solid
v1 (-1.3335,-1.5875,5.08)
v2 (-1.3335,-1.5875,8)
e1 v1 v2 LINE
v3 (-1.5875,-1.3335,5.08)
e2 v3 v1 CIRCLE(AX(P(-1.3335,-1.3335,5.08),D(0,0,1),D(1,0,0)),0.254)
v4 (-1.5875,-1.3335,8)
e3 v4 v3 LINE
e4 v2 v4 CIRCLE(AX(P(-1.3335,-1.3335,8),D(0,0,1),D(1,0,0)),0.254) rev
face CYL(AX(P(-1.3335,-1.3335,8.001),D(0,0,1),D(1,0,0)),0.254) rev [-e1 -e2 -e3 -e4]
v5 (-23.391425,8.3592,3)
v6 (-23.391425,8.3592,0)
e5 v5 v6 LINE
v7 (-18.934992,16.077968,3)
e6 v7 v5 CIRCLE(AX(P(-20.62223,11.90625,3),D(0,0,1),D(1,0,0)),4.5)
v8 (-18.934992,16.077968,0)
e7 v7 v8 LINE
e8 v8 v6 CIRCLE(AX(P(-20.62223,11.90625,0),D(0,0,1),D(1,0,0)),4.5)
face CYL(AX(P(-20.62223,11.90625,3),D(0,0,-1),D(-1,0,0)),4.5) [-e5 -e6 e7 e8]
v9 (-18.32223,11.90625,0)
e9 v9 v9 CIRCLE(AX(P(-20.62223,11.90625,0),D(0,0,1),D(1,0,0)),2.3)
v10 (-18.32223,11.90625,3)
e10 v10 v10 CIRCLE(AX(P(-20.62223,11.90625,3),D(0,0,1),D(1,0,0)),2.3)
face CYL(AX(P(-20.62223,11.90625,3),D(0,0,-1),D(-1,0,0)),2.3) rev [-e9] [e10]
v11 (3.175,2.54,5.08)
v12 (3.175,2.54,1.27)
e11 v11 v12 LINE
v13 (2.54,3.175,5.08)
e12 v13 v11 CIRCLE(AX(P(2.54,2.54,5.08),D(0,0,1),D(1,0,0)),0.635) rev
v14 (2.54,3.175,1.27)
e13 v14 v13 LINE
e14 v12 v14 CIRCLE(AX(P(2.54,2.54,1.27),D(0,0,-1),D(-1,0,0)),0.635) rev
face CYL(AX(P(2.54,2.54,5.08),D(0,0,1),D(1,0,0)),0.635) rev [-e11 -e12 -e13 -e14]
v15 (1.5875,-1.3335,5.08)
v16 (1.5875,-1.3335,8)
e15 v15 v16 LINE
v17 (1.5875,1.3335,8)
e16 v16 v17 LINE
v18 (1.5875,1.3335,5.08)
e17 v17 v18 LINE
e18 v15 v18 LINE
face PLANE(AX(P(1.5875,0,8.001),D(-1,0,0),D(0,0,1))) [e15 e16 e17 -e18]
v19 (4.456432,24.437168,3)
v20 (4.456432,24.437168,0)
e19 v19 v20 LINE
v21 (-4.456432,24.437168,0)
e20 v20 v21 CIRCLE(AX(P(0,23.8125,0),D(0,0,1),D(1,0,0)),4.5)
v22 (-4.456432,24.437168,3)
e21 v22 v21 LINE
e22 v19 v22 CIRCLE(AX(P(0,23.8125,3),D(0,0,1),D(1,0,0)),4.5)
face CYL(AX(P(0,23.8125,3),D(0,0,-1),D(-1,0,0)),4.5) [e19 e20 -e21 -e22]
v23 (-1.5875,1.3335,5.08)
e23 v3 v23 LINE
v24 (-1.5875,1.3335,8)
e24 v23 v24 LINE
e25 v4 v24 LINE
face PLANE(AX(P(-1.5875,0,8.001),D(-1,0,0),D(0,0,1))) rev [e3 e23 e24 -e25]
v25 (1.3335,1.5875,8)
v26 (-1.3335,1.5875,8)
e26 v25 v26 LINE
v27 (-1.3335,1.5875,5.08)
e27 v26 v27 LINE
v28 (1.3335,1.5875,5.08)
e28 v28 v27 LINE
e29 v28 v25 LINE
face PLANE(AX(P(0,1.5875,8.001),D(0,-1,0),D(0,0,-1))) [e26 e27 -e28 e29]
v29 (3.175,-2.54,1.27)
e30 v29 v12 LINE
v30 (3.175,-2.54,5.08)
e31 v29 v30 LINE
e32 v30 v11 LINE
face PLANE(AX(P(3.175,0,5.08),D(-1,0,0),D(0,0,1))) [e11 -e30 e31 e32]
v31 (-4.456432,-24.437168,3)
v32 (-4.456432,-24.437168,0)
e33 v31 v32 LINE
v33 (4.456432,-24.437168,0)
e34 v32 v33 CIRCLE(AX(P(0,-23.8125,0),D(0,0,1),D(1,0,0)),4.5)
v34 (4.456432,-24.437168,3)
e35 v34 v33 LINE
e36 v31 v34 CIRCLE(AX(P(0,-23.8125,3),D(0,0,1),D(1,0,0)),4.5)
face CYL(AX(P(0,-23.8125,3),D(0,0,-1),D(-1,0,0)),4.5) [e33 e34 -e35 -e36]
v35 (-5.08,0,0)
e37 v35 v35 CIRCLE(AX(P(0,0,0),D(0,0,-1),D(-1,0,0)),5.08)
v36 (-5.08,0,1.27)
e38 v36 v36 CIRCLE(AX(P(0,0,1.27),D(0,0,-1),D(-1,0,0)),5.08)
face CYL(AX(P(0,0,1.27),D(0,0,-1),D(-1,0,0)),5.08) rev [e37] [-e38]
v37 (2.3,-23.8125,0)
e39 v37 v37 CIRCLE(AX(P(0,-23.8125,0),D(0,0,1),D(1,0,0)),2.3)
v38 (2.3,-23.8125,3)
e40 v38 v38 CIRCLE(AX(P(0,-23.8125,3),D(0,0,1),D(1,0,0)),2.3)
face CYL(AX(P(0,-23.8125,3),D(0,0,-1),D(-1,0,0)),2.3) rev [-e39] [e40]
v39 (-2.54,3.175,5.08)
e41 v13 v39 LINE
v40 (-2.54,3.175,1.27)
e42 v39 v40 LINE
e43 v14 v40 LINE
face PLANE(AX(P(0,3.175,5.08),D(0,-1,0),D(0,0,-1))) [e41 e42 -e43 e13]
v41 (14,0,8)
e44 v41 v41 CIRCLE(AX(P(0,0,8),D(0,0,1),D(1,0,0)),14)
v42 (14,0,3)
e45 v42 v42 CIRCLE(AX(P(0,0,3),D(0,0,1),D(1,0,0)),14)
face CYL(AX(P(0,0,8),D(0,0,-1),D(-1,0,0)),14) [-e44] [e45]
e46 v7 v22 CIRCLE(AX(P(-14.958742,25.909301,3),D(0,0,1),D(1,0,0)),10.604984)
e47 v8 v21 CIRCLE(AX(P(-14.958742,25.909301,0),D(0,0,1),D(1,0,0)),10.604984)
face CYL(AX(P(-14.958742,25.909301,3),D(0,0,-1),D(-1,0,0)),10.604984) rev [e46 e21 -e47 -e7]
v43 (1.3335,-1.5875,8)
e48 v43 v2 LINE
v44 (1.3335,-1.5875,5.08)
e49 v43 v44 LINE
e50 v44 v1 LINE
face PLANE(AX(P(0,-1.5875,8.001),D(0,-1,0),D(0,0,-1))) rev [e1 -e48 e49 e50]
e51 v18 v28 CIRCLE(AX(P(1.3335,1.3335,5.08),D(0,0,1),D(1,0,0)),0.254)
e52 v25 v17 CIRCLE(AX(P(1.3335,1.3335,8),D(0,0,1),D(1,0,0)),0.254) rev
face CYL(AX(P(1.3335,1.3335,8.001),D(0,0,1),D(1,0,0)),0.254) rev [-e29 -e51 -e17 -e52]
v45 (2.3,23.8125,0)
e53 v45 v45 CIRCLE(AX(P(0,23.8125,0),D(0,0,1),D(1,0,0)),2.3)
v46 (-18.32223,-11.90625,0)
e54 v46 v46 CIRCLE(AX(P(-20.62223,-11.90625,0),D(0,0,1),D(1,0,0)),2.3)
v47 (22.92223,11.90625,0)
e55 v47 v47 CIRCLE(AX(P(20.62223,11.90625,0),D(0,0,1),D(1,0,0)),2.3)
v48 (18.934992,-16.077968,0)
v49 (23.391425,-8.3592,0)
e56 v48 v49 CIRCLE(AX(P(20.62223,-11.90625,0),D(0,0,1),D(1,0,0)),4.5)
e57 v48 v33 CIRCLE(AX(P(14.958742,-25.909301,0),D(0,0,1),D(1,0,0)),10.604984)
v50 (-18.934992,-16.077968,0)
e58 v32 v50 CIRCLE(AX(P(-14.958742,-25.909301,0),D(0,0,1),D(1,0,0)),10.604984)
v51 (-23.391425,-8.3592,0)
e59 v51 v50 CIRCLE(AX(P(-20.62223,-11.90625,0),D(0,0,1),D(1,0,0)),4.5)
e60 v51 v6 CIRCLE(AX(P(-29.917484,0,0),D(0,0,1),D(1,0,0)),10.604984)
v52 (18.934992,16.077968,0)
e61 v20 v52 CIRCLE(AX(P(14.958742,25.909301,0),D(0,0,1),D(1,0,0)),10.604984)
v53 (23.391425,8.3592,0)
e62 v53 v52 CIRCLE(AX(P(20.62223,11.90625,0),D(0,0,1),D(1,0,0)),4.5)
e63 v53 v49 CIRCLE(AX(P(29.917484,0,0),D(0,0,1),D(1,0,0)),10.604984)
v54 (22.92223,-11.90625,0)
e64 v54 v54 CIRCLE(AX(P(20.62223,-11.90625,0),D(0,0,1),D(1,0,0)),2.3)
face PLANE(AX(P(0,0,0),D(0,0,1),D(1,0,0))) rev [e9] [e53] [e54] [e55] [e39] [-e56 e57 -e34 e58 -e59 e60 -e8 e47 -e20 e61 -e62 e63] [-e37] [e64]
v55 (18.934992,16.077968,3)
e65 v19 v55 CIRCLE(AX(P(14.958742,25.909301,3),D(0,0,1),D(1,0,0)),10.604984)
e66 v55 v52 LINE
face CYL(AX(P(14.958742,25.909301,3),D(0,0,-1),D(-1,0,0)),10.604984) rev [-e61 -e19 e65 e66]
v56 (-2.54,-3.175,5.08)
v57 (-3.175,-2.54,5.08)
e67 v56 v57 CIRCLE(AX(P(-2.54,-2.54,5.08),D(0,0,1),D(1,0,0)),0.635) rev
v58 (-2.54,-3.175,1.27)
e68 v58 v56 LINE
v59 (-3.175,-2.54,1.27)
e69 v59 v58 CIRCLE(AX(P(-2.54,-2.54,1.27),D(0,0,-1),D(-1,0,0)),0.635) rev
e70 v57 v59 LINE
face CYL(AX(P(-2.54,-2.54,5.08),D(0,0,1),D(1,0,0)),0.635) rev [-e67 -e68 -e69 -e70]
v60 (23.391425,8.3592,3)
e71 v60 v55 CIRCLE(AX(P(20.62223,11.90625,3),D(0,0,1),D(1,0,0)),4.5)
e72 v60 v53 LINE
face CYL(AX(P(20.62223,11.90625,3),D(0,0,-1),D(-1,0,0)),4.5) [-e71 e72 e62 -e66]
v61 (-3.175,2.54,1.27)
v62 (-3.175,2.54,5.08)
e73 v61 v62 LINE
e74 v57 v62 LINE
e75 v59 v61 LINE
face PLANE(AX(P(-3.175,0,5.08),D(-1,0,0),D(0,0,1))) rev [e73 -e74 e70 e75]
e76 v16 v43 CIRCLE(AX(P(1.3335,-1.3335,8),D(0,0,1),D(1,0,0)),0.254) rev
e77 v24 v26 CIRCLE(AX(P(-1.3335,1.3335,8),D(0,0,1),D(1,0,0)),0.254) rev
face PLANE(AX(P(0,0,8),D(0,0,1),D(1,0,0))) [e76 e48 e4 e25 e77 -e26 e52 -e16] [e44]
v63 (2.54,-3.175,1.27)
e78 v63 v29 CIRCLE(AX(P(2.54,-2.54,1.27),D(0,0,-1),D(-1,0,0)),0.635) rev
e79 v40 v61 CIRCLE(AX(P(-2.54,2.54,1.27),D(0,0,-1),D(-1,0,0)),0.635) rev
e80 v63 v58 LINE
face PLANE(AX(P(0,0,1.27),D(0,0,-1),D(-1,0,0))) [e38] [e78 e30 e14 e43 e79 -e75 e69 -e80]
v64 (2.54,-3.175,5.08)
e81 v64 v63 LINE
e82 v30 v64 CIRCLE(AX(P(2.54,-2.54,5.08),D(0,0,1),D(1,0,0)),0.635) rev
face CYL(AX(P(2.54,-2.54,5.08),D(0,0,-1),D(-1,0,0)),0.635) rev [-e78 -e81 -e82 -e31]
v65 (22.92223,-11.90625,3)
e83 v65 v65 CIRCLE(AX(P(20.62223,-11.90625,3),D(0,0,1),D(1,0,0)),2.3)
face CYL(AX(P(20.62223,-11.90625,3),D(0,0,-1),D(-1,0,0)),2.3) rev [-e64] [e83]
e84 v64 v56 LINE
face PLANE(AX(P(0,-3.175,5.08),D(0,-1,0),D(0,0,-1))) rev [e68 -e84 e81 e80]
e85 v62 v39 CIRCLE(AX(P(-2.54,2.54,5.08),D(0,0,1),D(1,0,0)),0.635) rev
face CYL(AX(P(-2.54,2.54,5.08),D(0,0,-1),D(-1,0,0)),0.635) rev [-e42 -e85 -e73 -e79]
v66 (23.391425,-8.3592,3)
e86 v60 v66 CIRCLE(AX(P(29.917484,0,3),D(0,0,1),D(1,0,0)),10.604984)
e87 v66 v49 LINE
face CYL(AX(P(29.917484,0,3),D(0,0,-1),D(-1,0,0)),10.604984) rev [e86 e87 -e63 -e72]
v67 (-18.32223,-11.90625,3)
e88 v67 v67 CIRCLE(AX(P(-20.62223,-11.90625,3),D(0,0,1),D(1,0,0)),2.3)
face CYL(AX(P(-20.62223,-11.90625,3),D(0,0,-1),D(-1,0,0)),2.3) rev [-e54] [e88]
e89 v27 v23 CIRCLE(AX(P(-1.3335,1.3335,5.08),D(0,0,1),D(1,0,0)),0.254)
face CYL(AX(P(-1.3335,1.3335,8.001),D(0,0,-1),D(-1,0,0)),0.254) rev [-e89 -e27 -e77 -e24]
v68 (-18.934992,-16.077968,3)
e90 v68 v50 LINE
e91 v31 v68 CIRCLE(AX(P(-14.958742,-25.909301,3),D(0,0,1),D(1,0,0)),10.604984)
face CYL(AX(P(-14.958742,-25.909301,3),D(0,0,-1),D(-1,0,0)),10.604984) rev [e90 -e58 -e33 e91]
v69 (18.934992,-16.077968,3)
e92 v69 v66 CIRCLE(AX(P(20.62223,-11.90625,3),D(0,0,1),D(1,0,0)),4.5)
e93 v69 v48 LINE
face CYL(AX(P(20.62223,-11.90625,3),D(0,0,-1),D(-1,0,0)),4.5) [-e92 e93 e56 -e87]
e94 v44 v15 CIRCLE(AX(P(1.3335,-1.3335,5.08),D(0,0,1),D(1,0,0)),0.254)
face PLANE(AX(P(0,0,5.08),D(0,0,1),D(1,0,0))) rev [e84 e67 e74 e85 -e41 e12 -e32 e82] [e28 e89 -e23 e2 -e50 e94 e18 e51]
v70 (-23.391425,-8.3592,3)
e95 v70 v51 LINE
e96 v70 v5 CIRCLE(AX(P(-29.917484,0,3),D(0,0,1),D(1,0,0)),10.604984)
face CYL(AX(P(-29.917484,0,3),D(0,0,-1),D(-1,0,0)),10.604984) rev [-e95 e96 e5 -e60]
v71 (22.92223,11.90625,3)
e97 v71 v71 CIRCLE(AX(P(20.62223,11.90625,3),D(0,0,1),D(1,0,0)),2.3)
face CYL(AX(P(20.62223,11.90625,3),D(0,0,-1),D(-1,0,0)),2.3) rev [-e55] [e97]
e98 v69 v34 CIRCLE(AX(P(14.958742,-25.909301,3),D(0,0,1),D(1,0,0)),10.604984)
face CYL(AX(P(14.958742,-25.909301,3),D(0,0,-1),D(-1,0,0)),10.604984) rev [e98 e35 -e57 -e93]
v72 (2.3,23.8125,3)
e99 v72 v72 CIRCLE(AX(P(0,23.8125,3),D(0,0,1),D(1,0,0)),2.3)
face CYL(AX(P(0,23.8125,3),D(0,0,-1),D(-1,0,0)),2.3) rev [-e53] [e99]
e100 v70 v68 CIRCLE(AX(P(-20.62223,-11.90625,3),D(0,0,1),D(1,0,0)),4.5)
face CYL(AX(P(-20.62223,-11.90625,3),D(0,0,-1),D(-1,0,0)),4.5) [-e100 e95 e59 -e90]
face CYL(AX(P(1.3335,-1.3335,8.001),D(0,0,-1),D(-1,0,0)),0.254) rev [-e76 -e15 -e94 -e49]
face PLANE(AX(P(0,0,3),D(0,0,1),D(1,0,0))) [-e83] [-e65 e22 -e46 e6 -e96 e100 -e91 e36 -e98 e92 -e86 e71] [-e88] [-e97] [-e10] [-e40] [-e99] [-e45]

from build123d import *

# Parameters (mm, degrees)
SKETCH1_R           = 2.3
BOSS_EXTRUDE1_DEPTH = 3
SKETCH2_R           = 14
BOSS_EXTRUDE2_DEPTH = 5
CUT_EXTRUDE1_REACH  = 40.688
SKETCH3_W           = 3.175
SKETCH3_H           = 3.175
SKETCH3_3_R         = 5.08
SKETCH3_3_W         = 6.35
SKETCH3_3_H         = 6.35
SKETCH3_3_W_2       = 3.175
SKETCH3_3_H_2       = 3.175
CUT_EXTRUDE2_DEPTH  = 1.27
CUT_EXTRUDE3_START  = -1.27
SKETCH3_4_W         = 6.35
SKETCH3_4_H         = 6.35
SKETCH3_4_W_2       = 3.175
SKETCH3_4_H_2       = 3.175
CUT_EXTRUDE3_DEPTH  = 3.81
FILLET1_R           = 0.254
FILLET2_R           = 0.635


with BuildPart() as part:
    # Sketch1 → Boss-Extrude1 (new body)
    with BuildSketch(Plane.XY):
        with BuildLine():
            ThreePointArc((4.456432387, 24.437168219), (-4.5e-08, 28.3125), (-4.456432399, 24.43716813))
            ThreePointArc((-4.456432399, 24.43716813), (-9.656250022, 16.725115598), (-18.934992245, 16.077967752))
            ThreePointArc((-18.934992245, 16.077967752), (-24.519343502, 14.156251286), (-23.391426978, 8.359202257))
            ThreePointArc((-23.391426978, 8.359202257), (-19.3125, 3.465e-06), (-23.391421517, -8.359197993))
            ThreePointArc((-23.391421517, -8.359197993), (-24.519344633, -14.156249327), (-18.934990017, -16.077966851))
            ThreePointArc((-18.934990017, -16.077966851), (-9.65625113, -16.725114958), (-4.456433088, -24.437163215))
            ThreePointArc((-4.456433088, -24.437163215), (-2.557e-06, -28.3125), (4.456432378, -24.437168281))
            ThreePointArc((4.456432378, -24.437168281), (9.656248045, -16.725116739), (18.934988153, -16.077966097))
            ThreePointArc((18.934988153, -16.077966097), (24.519343112, -14.156251962), (23.391424728, -8.3592005))
            ThreePointArc((23.391424728, -8.3592005), (19.3125, 1.013e-06), (23.391426325, 8.359201747))
            ThreePointArc((23.391426325, 8.359201747), (24.519343744, 14.156250867), (18.934992375, 16.077967805))
            ThreePointArc((18.934992375, 16.077967805), (9.656250044, 16.725115585), (4.456432387, 24.437168219))
        make_face()
        with Locations((0, 23.8125)):
            Circle(SKETCH1_R, mode=Mode.SUBTRACT)
        with Locations((20.622229928, 11.90625)):
            Circle(SKETCH1_R, mode=Mode.SUBTRACT)
        with Locations((-20.622229928, 11.90625)):
            Circle(SKETCH1_R, mode=Mode.SUBTRACT)
        with Locations((20.622229928, -11.90625)):
            Circle(SKETCH1_R, mode=Mode.SUBTRACT)
        with Locations((-20.622229928, -11.90625)):
            Circle(SKETCH1_R, mode=Mode.SUBTRACT)
        with Locations((0, -23.8125)):
            Circle(SKETCH1_R, mode=Mode.SUBTRACT)
    extrude(amount=BOSS_EXTRUDE1_DEPTH)

    # Sketch2 → Boss-Extrude2 (add)
    with BuildSketch(Plane.XY.offset(3)):
        Circle(SKETCH2_R)
    extrude(amount=BOSS_EXTRUDE2_DEPTH)

    # Sketch3 → Cut-Extrude1 (cut, up to next)
    with BuildSketch(Plane(origin=(0, 0, 0), x_dir=(-1, 0, 0), z_dir=(0, 0, -1)), mode=Mode.PRIVATE) as cut_extrude1_sk1:
        Rectangle(SKETCH3_W, SKETCH3_H)
    cut_extrude1_tool1 = extrude(cut_extrude1_sk1.sketch, amount=-CUT_EXTRUDE1_REACH, mode=Mode.PRIVATE) & part.part
    add(cut_extrude1_tool1.solids().sort_by_distance((0, 0, 0))[0], mode=Mode.SUBTRACT)

    # Sketch3<3> → Cut-Extrude2 (cut)
    # profile 1 of 3: a face of its own
    with BuildSketch(Plane(origin=(0, 0, 0), x_dir=(-1, 0, 0), z_dir=(0, 0, -1))):
        Circle(SKETCH3_3_R)
        Rectangle(SKETCH3_3_W, SKETCH3_3_H, mode=Mode.SUBTRACT)
    # profile 2 of 3: a face of its own
    with BuildSketch(Plane(origin=(0, 0, 0), x_dir=(-1, 0, 0), z_dir=(0, 0, -1))):
        Rectangle(SKETCH3_3_W, SKETCH3_3_H)
        Rectangle(SKETCH3_3_W_2, SKETCH3_3_H_2, mode=Mode.SUBTRACT)
    # profile 3 of 3: a face of its own
    with BuildSketch(Plane(origin=(0, 0, 0), x_dir=(-1, 0, 0), z_dir=(0, 0, -1))):
        Rectangle(SKETCH3_3_W_2, SKETCH3_3_H_2)
    extrude(amount=-CUT_EXTRUDE2_DEPTH, mode=Mode.SUBTRACT)

    # Sketch3<4> → Cut-Extrude3 (cut)
    with BuildSketch(Plane(origin=(0, 0, 0), x_dir=(-1, 0, 0), z_dir=(0, 0, -1)).offset(CUT_EXTRUDE3_START)):
        Rectangle(SKETCH3_4_W, SKETCH3_4_H)
        Rectangle(SKETCH3_4_W_2, SKETCH3_4_H_2, mode=Mode.SUBTRACT)
    extrude(amount=-CUT_EXTRUDE3_DEPTH, mode=Mode.SUBTRACT)

    # Fillet1
    fillet1_edges = [part.edges().sort_by_distance(p)[0] for p in [
        (-1.5875, -1.5875, 6.54),
        (1.5875, -1.5875, 6.54),
        (1.5875, 1.5875, 6.54),
        (-1.5875, 1.5875, 6.54),
    ]]
    fillet(fillet1_edges, radius=FILLET1_R)

    # Fillet2
    fillet2_edges = [part.edges().sort_by_distance(p)[0] for p in [
        (3.175, -3.175, 3.175),
        (3.175, 3.175, 3.175),
        (-3.175, 3.175, 3.175),
        (-3.175, -3.175, 3.175),
    ]]
    fillet(fillet2_edges, radius=FILLET2_R)


solid = part.part
